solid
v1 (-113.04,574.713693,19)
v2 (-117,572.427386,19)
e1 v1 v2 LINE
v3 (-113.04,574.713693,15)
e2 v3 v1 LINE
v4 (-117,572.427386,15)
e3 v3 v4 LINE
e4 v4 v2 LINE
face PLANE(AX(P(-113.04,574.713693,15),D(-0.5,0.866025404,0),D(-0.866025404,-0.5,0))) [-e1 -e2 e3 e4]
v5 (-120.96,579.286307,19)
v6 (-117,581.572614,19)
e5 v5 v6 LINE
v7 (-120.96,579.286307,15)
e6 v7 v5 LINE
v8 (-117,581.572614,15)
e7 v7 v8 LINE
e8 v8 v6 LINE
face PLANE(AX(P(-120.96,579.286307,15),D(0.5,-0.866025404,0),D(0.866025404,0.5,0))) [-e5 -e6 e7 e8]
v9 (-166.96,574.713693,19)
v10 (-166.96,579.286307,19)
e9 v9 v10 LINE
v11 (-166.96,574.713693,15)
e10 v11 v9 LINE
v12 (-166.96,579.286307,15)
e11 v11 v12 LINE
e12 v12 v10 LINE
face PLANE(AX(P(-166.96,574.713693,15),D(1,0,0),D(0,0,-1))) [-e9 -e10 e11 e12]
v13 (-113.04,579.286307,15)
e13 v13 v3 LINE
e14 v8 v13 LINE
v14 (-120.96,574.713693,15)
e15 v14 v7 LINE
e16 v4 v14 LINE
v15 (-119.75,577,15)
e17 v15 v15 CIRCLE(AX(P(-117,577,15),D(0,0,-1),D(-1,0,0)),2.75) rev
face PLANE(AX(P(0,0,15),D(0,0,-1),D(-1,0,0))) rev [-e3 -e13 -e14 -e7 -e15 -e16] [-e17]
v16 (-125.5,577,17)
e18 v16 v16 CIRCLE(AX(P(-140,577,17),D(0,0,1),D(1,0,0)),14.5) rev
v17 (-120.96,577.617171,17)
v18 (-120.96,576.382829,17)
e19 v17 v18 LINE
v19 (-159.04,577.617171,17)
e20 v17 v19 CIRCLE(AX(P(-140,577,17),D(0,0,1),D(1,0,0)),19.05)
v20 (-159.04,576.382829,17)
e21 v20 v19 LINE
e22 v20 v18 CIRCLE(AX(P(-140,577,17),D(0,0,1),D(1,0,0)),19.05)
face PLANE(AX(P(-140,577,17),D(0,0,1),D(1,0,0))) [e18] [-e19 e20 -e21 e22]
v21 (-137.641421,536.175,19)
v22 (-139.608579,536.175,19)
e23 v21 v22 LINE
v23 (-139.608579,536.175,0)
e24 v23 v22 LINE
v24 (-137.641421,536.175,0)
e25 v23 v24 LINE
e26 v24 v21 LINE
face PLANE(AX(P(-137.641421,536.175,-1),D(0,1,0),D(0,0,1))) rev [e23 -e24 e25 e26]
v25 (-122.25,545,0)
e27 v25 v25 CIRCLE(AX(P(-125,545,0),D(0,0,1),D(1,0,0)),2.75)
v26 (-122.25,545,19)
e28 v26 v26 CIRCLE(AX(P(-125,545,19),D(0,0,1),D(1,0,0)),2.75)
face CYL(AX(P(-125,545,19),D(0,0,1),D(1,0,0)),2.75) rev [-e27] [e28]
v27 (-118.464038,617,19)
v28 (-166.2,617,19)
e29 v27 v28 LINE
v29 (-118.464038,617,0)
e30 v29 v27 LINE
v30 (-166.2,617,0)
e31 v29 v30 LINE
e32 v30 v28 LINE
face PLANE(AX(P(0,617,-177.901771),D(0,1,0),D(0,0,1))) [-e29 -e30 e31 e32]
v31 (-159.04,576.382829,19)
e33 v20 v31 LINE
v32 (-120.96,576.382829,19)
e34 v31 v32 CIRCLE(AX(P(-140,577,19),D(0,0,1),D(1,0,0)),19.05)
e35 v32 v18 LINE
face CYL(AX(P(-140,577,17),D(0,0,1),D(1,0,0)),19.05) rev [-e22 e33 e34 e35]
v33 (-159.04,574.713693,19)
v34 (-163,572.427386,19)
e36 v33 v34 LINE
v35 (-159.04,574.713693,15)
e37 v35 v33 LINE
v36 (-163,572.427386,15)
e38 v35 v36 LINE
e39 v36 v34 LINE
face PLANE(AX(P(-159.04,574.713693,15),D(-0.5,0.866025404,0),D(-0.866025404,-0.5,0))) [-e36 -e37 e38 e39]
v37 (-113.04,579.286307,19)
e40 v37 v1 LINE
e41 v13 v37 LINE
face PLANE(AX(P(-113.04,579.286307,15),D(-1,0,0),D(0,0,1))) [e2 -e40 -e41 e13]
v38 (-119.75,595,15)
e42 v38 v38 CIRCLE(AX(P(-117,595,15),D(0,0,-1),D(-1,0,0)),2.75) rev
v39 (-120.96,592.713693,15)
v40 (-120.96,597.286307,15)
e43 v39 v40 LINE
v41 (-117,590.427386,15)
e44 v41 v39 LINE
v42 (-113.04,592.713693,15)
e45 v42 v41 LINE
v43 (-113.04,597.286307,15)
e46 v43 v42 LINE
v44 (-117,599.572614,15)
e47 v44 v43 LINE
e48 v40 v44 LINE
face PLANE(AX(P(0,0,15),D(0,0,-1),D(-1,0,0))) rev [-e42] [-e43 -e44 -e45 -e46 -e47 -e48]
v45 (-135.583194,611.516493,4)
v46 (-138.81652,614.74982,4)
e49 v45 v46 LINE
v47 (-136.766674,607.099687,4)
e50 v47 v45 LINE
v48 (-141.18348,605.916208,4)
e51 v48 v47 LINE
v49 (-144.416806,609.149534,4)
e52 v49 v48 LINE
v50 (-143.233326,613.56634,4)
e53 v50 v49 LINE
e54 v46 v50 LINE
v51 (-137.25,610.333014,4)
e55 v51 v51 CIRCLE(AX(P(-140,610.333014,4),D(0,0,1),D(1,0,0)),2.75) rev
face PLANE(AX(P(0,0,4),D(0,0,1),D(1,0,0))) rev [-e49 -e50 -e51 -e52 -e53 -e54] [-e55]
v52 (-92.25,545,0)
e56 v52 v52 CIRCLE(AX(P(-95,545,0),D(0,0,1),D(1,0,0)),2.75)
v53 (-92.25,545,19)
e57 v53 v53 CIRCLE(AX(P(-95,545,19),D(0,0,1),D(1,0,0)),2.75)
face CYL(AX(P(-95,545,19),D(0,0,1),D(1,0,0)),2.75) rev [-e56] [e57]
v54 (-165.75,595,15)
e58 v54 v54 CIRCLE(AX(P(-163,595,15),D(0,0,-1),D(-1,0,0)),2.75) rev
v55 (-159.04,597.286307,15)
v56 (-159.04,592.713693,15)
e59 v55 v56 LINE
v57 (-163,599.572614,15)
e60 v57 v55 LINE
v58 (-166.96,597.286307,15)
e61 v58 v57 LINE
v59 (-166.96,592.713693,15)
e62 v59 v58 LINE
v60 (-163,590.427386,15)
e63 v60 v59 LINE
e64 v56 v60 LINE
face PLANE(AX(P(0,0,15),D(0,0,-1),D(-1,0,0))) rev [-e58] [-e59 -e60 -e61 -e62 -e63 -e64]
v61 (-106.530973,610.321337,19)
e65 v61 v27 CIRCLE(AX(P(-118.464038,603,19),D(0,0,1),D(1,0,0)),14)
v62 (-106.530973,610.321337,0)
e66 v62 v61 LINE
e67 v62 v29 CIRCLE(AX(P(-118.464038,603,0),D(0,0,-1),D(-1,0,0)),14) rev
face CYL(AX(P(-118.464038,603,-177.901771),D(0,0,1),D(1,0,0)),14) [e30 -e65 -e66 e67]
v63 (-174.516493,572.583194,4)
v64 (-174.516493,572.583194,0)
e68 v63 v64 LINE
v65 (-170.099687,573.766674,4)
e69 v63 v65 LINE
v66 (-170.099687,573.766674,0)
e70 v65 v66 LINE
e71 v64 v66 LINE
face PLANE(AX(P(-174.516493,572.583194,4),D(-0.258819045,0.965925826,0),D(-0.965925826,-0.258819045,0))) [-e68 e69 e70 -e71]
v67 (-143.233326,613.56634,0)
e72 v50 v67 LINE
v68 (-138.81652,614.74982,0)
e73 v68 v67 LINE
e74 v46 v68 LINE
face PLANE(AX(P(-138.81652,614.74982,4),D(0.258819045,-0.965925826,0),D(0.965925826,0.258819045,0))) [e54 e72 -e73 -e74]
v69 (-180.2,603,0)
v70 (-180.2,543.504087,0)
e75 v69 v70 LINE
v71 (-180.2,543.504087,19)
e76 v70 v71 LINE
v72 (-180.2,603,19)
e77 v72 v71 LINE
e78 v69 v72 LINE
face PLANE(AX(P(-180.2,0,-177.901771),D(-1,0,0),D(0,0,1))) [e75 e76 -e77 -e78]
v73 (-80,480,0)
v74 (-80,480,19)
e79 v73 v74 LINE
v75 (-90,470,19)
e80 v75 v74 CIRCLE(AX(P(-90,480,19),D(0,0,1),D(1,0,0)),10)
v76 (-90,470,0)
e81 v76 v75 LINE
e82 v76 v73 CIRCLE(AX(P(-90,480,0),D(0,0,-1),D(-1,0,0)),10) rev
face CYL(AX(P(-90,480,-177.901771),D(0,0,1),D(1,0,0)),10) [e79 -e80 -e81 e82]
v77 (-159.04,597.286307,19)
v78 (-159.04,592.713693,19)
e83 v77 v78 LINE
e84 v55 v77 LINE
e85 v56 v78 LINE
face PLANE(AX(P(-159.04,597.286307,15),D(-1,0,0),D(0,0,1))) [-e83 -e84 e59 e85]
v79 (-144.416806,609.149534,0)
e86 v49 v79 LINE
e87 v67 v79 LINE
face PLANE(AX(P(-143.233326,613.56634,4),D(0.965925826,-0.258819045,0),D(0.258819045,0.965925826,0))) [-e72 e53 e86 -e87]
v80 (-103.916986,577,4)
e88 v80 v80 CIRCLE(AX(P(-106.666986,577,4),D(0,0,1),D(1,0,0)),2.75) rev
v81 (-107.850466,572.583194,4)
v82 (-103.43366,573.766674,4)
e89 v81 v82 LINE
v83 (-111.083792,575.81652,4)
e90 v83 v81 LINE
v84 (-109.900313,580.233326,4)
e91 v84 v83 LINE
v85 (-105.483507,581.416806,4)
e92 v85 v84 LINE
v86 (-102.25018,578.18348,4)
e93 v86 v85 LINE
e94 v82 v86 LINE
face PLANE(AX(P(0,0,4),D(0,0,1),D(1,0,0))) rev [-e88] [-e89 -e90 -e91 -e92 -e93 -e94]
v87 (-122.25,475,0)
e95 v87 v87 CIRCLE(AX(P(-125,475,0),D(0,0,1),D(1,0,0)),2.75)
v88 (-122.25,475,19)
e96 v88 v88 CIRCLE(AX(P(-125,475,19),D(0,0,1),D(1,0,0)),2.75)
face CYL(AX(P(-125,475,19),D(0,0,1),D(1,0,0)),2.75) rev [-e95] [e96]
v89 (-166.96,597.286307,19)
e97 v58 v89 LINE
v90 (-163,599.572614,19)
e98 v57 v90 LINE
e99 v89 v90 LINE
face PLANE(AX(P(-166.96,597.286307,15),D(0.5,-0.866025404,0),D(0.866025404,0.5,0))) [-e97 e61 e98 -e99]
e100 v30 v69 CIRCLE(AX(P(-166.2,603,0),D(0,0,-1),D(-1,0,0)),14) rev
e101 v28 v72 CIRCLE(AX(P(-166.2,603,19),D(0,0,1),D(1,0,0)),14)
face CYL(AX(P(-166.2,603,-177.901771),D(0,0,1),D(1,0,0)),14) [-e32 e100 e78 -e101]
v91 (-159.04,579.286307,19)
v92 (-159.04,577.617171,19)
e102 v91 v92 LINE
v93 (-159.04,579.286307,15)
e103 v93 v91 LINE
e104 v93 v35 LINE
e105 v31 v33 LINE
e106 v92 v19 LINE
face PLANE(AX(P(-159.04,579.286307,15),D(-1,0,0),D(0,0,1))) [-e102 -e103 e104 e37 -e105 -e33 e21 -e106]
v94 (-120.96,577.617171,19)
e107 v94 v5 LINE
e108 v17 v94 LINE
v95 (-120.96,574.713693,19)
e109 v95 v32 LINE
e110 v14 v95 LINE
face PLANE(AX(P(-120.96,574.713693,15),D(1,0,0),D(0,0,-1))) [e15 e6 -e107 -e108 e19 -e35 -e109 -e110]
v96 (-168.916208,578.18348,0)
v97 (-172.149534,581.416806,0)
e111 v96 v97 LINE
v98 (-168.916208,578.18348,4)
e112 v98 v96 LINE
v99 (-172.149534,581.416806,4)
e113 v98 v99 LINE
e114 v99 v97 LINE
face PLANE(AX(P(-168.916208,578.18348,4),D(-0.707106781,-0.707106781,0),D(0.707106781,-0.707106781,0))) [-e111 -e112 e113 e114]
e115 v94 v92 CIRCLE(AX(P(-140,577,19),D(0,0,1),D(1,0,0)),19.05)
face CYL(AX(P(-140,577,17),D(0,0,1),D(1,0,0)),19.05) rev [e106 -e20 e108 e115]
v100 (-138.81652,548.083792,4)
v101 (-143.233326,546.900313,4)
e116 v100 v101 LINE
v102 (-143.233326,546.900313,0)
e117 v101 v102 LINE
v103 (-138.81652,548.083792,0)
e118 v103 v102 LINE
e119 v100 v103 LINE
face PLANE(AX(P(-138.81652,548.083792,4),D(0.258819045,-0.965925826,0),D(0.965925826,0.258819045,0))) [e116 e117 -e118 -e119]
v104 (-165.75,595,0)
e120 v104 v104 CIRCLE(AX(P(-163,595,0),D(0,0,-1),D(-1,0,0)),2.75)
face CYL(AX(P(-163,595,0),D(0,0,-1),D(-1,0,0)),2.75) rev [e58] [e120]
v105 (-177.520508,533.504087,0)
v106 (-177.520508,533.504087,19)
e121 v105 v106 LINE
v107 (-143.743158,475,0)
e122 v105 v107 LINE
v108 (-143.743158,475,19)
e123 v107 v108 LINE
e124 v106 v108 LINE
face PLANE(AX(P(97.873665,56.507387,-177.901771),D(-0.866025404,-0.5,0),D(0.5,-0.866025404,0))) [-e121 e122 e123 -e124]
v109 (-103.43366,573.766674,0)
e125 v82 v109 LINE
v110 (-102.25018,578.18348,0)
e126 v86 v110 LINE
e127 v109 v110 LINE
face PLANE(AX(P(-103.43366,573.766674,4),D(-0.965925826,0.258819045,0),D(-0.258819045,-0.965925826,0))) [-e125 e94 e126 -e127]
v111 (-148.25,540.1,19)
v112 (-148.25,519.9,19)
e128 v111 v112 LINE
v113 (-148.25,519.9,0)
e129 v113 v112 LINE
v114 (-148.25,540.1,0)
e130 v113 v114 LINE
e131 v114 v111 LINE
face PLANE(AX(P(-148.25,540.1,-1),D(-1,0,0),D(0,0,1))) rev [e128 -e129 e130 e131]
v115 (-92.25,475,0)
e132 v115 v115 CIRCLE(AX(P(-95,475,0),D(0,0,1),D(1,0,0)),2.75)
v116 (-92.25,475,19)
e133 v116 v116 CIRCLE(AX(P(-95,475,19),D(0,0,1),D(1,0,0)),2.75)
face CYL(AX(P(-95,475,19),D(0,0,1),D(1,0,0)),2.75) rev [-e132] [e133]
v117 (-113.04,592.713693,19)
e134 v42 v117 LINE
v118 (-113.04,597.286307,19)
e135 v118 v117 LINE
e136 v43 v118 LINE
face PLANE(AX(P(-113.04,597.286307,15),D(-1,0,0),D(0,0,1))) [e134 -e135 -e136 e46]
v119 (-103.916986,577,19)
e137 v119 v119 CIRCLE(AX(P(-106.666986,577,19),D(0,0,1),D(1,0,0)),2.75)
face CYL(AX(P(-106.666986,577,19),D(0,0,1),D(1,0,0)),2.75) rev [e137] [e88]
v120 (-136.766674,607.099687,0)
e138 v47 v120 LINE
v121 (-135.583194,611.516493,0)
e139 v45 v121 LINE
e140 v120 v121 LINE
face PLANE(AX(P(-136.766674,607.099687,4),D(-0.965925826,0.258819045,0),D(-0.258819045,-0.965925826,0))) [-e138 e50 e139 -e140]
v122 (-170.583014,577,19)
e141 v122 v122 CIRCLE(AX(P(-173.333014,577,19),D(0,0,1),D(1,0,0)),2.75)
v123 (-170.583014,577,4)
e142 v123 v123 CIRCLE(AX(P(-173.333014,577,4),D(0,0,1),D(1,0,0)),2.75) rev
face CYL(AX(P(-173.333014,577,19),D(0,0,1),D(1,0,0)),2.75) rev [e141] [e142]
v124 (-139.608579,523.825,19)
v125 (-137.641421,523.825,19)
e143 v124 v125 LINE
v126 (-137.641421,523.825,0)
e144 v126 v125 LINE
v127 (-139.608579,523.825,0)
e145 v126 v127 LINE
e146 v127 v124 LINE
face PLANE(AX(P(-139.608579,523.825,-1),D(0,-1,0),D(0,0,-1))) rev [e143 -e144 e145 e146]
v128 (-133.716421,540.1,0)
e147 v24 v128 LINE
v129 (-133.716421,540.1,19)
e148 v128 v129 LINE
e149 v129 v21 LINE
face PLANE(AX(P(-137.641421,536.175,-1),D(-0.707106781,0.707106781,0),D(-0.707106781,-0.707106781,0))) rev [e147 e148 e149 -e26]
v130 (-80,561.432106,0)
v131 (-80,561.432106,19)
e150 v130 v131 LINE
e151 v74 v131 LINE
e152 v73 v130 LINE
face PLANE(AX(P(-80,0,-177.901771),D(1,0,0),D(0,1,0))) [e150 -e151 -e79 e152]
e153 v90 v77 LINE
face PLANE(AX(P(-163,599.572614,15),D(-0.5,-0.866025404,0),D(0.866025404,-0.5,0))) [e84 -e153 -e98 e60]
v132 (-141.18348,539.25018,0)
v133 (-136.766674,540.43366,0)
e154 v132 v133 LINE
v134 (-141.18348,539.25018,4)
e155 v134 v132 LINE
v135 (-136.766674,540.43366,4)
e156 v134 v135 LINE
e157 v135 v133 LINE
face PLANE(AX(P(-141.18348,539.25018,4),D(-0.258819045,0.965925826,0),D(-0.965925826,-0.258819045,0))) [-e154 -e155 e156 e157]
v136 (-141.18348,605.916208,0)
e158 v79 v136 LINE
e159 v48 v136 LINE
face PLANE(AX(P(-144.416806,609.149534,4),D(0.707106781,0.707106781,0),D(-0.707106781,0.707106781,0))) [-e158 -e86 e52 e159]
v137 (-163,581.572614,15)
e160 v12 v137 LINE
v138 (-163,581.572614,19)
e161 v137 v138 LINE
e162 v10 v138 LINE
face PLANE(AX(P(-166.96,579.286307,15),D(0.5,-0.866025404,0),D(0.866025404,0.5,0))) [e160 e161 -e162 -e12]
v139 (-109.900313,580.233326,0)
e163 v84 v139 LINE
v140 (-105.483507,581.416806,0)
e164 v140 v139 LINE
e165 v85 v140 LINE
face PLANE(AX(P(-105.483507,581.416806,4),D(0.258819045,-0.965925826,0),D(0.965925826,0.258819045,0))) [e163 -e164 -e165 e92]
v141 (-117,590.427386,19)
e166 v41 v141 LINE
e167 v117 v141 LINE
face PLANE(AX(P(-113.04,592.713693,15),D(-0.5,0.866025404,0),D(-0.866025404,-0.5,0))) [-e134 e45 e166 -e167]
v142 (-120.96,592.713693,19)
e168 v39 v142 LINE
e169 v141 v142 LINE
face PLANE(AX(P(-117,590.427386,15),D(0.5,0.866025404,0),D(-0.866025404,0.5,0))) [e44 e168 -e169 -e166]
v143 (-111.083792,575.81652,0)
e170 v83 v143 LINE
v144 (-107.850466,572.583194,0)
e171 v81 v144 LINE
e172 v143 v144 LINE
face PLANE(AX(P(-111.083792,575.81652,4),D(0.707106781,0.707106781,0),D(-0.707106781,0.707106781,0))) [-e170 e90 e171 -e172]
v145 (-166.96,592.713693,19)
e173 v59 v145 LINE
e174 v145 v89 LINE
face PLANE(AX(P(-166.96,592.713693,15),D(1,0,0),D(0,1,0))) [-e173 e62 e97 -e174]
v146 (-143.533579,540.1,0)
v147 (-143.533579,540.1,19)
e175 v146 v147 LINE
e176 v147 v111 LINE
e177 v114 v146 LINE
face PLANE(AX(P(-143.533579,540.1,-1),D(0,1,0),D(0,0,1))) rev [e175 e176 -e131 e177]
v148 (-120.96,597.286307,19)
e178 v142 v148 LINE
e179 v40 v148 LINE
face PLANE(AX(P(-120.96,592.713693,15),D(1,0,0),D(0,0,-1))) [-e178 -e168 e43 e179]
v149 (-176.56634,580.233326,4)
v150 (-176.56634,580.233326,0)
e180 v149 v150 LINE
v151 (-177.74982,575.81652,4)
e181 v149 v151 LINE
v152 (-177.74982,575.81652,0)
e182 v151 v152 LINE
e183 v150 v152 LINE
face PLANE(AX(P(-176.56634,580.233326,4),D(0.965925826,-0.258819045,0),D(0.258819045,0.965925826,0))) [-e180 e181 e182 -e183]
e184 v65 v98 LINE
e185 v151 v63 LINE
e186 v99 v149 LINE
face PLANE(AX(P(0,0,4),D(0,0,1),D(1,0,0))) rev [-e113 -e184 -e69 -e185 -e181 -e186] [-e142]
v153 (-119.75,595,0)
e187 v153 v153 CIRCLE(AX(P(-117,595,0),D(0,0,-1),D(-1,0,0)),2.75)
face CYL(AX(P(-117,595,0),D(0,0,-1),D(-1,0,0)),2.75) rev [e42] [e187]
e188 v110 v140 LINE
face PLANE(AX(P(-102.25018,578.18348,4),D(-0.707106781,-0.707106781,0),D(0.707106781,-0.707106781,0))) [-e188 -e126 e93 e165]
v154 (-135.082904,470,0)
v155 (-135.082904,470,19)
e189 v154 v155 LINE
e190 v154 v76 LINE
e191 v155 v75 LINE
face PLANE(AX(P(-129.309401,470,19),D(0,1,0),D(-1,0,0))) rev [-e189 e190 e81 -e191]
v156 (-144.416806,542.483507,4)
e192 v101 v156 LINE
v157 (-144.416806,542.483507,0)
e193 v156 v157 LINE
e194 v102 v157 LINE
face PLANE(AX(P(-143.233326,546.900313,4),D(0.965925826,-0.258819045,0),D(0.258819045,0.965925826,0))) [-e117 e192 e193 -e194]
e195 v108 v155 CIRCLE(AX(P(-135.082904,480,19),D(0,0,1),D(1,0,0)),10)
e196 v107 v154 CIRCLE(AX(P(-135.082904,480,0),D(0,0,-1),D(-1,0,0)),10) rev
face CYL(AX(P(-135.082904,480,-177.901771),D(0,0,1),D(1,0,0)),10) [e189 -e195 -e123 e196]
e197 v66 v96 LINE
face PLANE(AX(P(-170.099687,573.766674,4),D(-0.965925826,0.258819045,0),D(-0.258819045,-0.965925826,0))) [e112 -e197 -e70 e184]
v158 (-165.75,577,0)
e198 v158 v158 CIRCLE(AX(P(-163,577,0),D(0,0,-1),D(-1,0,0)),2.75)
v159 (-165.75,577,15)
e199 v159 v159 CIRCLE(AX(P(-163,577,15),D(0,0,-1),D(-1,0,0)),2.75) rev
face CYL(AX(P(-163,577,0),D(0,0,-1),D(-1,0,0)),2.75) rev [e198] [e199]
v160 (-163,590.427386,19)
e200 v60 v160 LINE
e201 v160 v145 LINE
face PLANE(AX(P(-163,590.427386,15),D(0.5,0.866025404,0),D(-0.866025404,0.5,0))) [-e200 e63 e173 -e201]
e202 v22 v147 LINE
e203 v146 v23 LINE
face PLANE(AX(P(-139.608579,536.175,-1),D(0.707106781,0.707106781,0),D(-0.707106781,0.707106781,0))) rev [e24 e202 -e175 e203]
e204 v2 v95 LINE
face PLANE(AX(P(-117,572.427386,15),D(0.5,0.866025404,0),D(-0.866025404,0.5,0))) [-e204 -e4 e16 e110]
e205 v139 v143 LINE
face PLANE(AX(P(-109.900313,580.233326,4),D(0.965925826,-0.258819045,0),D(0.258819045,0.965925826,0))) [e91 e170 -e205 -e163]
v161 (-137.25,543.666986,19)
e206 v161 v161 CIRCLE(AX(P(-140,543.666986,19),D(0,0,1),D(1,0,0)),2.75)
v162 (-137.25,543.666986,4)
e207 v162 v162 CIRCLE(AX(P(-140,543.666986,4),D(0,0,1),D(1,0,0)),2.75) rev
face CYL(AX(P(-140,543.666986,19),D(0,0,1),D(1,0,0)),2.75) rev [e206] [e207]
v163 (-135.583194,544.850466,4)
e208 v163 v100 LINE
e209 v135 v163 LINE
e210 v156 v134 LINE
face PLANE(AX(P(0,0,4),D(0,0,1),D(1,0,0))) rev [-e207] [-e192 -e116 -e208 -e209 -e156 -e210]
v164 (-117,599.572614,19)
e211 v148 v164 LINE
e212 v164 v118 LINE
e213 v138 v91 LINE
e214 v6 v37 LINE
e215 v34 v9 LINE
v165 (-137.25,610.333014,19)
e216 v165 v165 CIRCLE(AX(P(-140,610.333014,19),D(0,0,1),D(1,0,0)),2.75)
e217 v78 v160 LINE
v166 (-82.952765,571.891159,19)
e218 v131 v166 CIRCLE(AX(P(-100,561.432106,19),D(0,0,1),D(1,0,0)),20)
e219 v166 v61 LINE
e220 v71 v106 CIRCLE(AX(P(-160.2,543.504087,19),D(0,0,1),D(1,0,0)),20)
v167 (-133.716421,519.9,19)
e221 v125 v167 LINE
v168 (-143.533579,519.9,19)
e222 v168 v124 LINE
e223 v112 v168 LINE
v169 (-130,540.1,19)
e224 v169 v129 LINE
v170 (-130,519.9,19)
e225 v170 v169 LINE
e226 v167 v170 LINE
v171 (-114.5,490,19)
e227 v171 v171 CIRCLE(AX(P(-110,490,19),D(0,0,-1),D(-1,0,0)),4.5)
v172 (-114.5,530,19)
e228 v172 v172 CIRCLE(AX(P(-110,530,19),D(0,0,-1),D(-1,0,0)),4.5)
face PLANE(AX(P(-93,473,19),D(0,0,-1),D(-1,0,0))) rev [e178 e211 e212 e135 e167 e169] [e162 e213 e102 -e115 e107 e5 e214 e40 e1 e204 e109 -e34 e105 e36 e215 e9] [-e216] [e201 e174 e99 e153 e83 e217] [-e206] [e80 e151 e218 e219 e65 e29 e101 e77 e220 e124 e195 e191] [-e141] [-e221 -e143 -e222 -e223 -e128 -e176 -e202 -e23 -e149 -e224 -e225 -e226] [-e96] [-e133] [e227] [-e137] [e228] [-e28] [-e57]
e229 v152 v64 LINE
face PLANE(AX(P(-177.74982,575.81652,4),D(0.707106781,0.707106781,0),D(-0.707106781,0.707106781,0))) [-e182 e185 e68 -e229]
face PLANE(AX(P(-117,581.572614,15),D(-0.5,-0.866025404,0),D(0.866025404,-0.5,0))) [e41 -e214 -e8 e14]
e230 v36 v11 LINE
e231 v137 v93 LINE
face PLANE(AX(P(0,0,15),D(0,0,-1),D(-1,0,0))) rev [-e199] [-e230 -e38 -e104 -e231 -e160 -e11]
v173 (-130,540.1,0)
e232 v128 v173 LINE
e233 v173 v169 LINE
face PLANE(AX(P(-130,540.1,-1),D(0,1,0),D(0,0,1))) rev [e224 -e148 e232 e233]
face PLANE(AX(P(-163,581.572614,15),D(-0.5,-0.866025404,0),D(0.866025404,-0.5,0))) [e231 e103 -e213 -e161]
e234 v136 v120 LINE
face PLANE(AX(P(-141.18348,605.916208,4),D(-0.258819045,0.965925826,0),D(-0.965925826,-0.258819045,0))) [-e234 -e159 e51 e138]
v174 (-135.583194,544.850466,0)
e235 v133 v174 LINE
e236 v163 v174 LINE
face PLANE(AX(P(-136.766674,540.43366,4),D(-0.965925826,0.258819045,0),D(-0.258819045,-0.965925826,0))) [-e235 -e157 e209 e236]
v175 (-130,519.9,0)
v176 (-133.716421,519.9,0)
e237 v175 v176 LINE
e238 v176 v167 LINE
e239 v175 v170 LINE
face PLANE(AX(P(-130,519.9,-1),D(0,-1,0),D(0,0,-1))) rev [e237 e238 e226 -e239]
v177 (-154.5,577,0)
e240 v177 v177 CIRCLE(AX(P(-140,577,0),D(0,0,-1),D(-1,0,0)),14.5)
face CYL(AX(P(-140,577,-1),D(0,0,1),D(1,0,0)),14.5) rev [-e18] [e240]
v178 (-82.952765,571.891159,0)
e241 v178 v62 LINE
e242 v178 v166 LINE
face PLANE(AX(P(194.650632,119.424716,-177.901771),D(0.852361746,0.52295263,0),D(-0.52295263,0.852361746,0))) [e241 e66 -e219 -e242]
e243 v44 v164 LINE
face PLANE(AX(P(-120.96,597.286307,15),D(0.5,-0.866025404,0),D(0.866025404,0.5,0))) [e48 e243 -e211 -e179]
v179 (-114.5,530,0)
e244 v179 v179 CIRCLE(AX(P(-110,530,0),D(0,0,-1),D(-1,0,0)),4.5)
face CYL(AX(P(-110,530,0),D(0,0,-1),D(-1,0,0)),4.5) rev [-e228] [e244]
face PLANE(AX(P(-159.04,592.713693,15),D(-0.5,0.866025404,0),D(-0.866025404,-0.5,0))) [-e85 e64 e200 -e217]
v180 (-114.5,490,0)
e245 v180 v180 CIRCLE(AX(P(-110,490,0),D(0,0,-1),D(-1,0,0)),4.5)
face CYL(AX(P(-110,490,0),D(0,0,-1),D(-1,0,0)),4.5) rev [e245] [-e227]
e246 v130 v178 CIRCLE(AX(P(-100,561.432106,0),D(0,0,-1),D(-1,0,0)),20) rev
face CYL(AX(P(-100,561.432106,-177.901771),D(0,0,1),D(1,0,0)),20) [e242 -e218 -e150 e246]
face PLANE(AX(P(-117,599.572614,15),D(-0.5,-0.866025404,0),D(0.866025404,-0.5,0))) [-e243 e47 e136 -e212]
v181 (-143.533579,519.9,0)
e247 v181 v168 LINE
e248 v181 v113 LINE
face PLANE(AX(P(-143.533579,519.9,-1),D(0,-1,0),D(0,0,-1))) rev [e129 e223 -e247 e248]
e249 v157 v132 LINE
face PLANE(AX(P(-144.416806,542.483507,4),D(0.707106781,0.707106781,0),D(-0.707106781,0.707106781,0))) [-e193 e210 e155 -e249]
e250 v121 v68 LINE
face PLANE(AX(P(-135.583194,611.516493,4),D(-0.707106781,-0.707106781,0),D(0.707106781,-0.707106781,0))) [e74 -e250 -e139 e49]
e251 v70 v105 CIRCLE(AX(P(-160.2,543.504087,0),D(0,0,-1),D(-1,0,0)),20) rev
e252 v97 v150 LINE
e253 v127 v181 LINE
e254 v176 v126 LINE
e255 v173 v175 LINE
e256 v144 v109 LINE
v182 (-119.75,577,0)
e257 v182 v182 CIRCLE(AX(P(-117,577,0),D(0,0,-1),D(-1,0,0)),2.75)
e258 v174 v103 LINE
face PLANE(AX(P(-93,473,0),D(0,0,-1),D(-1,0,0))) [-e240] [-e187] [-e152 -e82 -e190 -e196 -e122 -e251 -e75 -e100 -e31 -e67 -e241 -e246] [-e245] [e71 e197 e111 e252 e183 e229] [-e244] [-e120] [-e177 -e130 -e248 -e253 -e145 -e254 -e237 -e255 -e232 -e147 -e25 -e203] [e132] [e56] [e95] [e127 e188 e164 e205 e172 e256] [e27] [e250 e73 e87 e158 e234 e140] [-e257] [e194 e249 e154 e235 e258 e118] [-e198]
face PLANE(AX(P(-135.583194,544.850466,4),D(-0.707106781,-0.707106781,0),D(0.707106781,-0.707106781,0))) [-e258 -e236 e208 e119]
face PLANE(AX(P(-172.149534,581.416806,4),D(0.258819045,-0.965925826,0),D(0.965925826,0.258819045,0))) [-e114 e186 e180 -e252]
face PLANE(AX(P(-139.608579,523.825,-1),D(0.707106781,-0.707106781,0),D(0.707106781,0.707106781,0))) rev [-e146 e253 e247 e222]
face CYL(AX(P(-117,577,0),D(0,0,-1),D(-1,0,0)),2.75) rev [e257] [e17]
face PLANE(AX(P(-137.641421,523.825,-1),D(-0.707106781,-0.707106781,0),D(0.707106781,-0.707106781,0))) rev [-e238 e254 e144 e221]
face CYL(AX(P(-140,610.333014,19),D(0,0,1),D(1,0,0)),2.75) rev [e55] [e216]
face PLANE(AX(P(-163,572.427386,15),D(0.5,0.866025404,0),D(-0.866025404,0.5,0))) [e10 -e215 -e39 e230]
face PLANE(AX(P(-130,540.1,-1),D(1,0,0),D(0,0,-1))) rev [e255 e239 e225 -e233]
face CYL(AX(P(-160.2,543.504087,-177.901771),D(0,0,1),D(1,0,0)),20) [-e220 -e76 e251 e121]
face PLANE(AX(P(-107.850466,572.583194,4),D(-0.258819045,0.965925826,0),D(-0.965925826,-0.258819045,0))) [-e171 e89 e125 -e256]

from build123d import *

# Parameters (mm, degrees)
BOSS_EXTRUDE1_DEPTH  = 19
FILLET1_R            = 10
BOSS_EXTRUDE2_DEPTH  = 19
SKETCH2_R            = 14.5
CUT_EXTRUDE1_DEPTH   = 20
M5_CLEARANCE_HOLE2_D = 5.5
M5_CLEARANCE_HOLE1_D = 5.5
M5_CLEARANCE_HOLE3_D = 5.5
M8_CLEARANCE_HOLE1_D = 9
CUT_EXTRUDE2_DEPTH   = 4
CUT_EXTRUDE3_DEPTH   = 4
SKETCH16_R           = 19.05
CUT_EXTRUDE4_DEPTH   = 2
CUT_EXTRUDE5_DEPTH   = 20


# Read off the part's stored shape, not the designer's step: Boss-Extrude2
with BuildPart() as part:
    # Sketch1 → Boss-Extrude1 (new body)
    with BuildSketch(Plane.XY):
        with BuildLine():
            Line((-170.200000001, 540.824594888), (-129.309401077, 470))
            Line((-129.309401077, 470), (-93, 470))
            ThreePointArc((-93, 470), (-90.878679656, 470.878679656), (-90, 473))
            Line((-90, 473), (-90, 564.25527297))
            Line((-90, 564.25527297), (-116.225329238, 607))
            Line((-116.225329238, 607), (-170.200000001, 607))
            Line((-170.200000001, 607), (-170.200000001, 540.824594888))
        make_face()
    extrude(amount=BOSS_EXTRUDE1_DEPTH)

    # Fillet1
    fillet1_edges = [part.edges().sort_by_distance(p)[0] for p in [
        (-90, 564.25527297, 9.5),
        (-129.309401077, 470, 9.5),
        (-170.200000001, 540.824594888, 9.5),
    ]]
    fillet(fillet1_edges, radius=FILLET1_R)

    # Boss-Extrude2 outline → Boss-Extrude2 (add)
    with BuildSketch(Plane.XY):
        with BuildLine():
            Line((-93, 470), (-90, 470))
            ThreePointArc((-90, 470), (-82.928932188, 472.928932188), (-80, 480))
            Line((-80, 480), (-80, 561.432106106))
            ThreePointArc((-80, 561.432106106), (-80.75234172, 566.866041212), (-82.952765074, 571.89115871))
            Line((-82.952765074, 571.89115871), (-106.530973281, 610.321336823))
            ThreePointArc((-106.530973281, 610.321336823), (-111.626593598, 615.216765438), (-118.464037729, 617))
            Line((-118.464037729, 617), (-166.200000001, 617))
            ThreePointArc((-166.200000001, 617), (-176.099494937, 612.899494936), (-180.200000001, 603))
            Line((-180.200000001, 603), (-180.200000001, 543.504086813))
            ThreePointArc((-180.200000001, 543.504086813), (-179.518516526, 538.327705911), (-177.520508076, 533.504086813))
            Line((-177.520508076, 533.504086813), (-143.743157806, 475))
            ThreePointArc((-143.743157806, 475), (-140.082903769, 471.339745962), (-135.082903769, 470))
            Line((-135.082903769, 470), (-123.535898385, 470))
            ThreePointArc((-123.535898385, 470), (-128.535898385, 471.339745962), (-132.196152423, 475))
            Line((-132.196152423, 475), (-168.860254039, 538.504086813))
            ThreePointArc((-168.860254039, 538.504086813), (-169.859258264, 540.915896362), (-170.200000001, 543.504086813))
            Line((-170.200000001, 543.504086813), (-170.200000001, 607))
            Line((-170.200000001, 607), (-116.225329238, 607))
            Line((-116.225329238, 607), (-91.476382537, 566.661632408))
            ThreePointArc((-91.476382537, 566.661632408), (-90.37617086, 564.149073659), (-90, 561.432106106))
            Line((-90, 561.432106106), (-90, 473))
            ThreePointArc((-90, 473), (-90.878679656, 470.878679656), (-93, 470))
        make_face()
    extrude(amount=BOSS_EXTRUDE2_DEPTH)

    # Sketch2 → Cut-Extrude1 (cut)
    with BuildSketch(Plane.XY.offset(19)):
        with Locations((-140, 577)):
            Circle(SKETCH2_R)
    extrude(amount=-CUT_EXTRUDE1_DEPTH, mode=Mode.SUBTRACT)

    # M5 Clearance Hole2 (through all)
    with Locations(Plane(origin=(0, 0, 0), x_dir=(-1, 0, 0), z_dir=(0, 0, -1))):
        with Locations((117.000000001, 595), (117.000000001, 577), (163.000000001, 577), (163.000000001, 595)):
            Hole(M5_CLEARANCE_HOLE2_D / 2)

    # M5 Clearance Hole1 (through all)
    with Locations(Plane.XY.offset(19)):
        with Locations((-95, 545), (-125, 545), (-125, 475), (-95, 475), (-110, 490), (-110, 530)):
            Hole(M5_CLEARANCE_HOLE1_D / 2)

    # M5 Clearance Hole3 (through all)
    with Locations(Plane.XY.offset(19)):
        with Locations((-140.000000001, 543.666986335), (-173.333013666, 577), (-106.666986336, 577), (-140.000000001, 610.333013665)):
            Hole(M5_CLEARANCE_HOLE3_D / 2)

    # M8 Clearance Hole1 (through all)
    with Locations(Plane(origin=(-110, 490, 0), x_dir=(-1, 0, 0), z_dir=(0, 0, -1))):
        with Locations((0, 0), (0, 40)):
            Hole(M8_CLEARANCE_HOLE1_D / 2)

    # Sketch14 → Cut-Extrude2 (cut)
    with BuildSketch(Plane(origin=(0, 0, 19), x_dir=(-1, 0, 0), z_dir=(0, 0, -1))):
        Polygon((117.000000001, 581.572614132), (113.04, 579.286307066), (113.04, 574.713692934), (117.000000001, 572.427385868), (120.960000001, 574.713692934), (120.960000001, 579.286307066), align=None)
        Polygon((163.000000001, 581.572614133), (159.04, 579.286307066), (159.04, 574.713692934), (163.000000001, 572.427385867), (166.960000001, 574.713692934), (166.960000001, 579.286307066), align=None)
        Polygon((163.000000001, 599.572614132), (159.040000001, 597.286307066), (159.040000001, 592.713692934), (163.000000001, 590.427385868), (166.960000001, 592.713692934), (166.960000001, 597.286307066), align=None)
        Polygon((120.960000001, 597.286307066), (117.000000001, 599.572614132), (113.040000001, 597.286307066), (113.040000001, 592.713692934), (117.000000001, 590.427385868), (120.960000001, 592.713692934), align=None)
    extrude(amount=CUT_EXTRUDE2_DEPTH, mode=Mode.SUBTRACT)

    # Sketch15 → Cut-Extrude3 (cut)
    with BuildSketch(Plane.XY):
        Polygon((-143.233326461, 546.900312795), (-144.416806085, 542.483506711), (-141.183479624, 539.25018025), (-136.76667354, 540.433659874), (-135.583193916, 544.850465958), (-138.816520377, 548.083792419), align=None)
        Polygon((-143.233326462, 613.566340126), (-144.416806085, 609.149534041), (-141.183479624, 605.91620758), (-136.76667354, 607.099687204), (-135.583193916, 611.516493288), (-138.816520377, 614.749819749), align=None)
        Polygon((-109.900312796, 580.23332646), (-111.083792419, 575.816520376), (-107.850465959, 572.583193916), (-103.433659875, 573.766673539), (-102.250180252, 578.183479623), (-105.483506712, 581.416806083), align=None)
        Polygon((-172.149534042, 581.416806083), (-176.566340126, 580.23332646), (-177.749819749, 575.816520376), (-174.516493289, 572.583193916), (-170.099687205, 573.766673539), (-168.916207582, 578.183479623), align=None)
    extrude(amount=CUT_EXTRUDE3_DEPTH, mode=Mode.SUBTRACT)

    # Sketch16 → Cut-Extrude4 (cut)
    with BuildSketch(Plane.XY.offset(19)):
        with Locations((-140, 577)):
            Circle(SKETCH16_R)
    extrude(amount=-CUT_EXTRUDE4_DEPTH, mode=Mode.SUBTRACT)

    # Sketch17 → Cut-Extrude5 (cut)
    with BuildSketch(Plane.XY.offset(19)):
        Polygon((-148.25, 540.1), (-148.25, 519.9), (-143.533578644, 519.9), (-139.608578644, 523.825), (-137.641421356, 523.825), (-133.716421356, 519.9), (-130, 519.9), (-130, 540.1), (-133.716421356, 540.1), (-137.641421356, 536.175), (-139.608578644, 536.175), (-143.533578644, 540.1), align=None)
    extrude(amount=-CUT_EXTRUDE5_DEPTH, mode=Mode.SUBTRACT)


solid = part.part
